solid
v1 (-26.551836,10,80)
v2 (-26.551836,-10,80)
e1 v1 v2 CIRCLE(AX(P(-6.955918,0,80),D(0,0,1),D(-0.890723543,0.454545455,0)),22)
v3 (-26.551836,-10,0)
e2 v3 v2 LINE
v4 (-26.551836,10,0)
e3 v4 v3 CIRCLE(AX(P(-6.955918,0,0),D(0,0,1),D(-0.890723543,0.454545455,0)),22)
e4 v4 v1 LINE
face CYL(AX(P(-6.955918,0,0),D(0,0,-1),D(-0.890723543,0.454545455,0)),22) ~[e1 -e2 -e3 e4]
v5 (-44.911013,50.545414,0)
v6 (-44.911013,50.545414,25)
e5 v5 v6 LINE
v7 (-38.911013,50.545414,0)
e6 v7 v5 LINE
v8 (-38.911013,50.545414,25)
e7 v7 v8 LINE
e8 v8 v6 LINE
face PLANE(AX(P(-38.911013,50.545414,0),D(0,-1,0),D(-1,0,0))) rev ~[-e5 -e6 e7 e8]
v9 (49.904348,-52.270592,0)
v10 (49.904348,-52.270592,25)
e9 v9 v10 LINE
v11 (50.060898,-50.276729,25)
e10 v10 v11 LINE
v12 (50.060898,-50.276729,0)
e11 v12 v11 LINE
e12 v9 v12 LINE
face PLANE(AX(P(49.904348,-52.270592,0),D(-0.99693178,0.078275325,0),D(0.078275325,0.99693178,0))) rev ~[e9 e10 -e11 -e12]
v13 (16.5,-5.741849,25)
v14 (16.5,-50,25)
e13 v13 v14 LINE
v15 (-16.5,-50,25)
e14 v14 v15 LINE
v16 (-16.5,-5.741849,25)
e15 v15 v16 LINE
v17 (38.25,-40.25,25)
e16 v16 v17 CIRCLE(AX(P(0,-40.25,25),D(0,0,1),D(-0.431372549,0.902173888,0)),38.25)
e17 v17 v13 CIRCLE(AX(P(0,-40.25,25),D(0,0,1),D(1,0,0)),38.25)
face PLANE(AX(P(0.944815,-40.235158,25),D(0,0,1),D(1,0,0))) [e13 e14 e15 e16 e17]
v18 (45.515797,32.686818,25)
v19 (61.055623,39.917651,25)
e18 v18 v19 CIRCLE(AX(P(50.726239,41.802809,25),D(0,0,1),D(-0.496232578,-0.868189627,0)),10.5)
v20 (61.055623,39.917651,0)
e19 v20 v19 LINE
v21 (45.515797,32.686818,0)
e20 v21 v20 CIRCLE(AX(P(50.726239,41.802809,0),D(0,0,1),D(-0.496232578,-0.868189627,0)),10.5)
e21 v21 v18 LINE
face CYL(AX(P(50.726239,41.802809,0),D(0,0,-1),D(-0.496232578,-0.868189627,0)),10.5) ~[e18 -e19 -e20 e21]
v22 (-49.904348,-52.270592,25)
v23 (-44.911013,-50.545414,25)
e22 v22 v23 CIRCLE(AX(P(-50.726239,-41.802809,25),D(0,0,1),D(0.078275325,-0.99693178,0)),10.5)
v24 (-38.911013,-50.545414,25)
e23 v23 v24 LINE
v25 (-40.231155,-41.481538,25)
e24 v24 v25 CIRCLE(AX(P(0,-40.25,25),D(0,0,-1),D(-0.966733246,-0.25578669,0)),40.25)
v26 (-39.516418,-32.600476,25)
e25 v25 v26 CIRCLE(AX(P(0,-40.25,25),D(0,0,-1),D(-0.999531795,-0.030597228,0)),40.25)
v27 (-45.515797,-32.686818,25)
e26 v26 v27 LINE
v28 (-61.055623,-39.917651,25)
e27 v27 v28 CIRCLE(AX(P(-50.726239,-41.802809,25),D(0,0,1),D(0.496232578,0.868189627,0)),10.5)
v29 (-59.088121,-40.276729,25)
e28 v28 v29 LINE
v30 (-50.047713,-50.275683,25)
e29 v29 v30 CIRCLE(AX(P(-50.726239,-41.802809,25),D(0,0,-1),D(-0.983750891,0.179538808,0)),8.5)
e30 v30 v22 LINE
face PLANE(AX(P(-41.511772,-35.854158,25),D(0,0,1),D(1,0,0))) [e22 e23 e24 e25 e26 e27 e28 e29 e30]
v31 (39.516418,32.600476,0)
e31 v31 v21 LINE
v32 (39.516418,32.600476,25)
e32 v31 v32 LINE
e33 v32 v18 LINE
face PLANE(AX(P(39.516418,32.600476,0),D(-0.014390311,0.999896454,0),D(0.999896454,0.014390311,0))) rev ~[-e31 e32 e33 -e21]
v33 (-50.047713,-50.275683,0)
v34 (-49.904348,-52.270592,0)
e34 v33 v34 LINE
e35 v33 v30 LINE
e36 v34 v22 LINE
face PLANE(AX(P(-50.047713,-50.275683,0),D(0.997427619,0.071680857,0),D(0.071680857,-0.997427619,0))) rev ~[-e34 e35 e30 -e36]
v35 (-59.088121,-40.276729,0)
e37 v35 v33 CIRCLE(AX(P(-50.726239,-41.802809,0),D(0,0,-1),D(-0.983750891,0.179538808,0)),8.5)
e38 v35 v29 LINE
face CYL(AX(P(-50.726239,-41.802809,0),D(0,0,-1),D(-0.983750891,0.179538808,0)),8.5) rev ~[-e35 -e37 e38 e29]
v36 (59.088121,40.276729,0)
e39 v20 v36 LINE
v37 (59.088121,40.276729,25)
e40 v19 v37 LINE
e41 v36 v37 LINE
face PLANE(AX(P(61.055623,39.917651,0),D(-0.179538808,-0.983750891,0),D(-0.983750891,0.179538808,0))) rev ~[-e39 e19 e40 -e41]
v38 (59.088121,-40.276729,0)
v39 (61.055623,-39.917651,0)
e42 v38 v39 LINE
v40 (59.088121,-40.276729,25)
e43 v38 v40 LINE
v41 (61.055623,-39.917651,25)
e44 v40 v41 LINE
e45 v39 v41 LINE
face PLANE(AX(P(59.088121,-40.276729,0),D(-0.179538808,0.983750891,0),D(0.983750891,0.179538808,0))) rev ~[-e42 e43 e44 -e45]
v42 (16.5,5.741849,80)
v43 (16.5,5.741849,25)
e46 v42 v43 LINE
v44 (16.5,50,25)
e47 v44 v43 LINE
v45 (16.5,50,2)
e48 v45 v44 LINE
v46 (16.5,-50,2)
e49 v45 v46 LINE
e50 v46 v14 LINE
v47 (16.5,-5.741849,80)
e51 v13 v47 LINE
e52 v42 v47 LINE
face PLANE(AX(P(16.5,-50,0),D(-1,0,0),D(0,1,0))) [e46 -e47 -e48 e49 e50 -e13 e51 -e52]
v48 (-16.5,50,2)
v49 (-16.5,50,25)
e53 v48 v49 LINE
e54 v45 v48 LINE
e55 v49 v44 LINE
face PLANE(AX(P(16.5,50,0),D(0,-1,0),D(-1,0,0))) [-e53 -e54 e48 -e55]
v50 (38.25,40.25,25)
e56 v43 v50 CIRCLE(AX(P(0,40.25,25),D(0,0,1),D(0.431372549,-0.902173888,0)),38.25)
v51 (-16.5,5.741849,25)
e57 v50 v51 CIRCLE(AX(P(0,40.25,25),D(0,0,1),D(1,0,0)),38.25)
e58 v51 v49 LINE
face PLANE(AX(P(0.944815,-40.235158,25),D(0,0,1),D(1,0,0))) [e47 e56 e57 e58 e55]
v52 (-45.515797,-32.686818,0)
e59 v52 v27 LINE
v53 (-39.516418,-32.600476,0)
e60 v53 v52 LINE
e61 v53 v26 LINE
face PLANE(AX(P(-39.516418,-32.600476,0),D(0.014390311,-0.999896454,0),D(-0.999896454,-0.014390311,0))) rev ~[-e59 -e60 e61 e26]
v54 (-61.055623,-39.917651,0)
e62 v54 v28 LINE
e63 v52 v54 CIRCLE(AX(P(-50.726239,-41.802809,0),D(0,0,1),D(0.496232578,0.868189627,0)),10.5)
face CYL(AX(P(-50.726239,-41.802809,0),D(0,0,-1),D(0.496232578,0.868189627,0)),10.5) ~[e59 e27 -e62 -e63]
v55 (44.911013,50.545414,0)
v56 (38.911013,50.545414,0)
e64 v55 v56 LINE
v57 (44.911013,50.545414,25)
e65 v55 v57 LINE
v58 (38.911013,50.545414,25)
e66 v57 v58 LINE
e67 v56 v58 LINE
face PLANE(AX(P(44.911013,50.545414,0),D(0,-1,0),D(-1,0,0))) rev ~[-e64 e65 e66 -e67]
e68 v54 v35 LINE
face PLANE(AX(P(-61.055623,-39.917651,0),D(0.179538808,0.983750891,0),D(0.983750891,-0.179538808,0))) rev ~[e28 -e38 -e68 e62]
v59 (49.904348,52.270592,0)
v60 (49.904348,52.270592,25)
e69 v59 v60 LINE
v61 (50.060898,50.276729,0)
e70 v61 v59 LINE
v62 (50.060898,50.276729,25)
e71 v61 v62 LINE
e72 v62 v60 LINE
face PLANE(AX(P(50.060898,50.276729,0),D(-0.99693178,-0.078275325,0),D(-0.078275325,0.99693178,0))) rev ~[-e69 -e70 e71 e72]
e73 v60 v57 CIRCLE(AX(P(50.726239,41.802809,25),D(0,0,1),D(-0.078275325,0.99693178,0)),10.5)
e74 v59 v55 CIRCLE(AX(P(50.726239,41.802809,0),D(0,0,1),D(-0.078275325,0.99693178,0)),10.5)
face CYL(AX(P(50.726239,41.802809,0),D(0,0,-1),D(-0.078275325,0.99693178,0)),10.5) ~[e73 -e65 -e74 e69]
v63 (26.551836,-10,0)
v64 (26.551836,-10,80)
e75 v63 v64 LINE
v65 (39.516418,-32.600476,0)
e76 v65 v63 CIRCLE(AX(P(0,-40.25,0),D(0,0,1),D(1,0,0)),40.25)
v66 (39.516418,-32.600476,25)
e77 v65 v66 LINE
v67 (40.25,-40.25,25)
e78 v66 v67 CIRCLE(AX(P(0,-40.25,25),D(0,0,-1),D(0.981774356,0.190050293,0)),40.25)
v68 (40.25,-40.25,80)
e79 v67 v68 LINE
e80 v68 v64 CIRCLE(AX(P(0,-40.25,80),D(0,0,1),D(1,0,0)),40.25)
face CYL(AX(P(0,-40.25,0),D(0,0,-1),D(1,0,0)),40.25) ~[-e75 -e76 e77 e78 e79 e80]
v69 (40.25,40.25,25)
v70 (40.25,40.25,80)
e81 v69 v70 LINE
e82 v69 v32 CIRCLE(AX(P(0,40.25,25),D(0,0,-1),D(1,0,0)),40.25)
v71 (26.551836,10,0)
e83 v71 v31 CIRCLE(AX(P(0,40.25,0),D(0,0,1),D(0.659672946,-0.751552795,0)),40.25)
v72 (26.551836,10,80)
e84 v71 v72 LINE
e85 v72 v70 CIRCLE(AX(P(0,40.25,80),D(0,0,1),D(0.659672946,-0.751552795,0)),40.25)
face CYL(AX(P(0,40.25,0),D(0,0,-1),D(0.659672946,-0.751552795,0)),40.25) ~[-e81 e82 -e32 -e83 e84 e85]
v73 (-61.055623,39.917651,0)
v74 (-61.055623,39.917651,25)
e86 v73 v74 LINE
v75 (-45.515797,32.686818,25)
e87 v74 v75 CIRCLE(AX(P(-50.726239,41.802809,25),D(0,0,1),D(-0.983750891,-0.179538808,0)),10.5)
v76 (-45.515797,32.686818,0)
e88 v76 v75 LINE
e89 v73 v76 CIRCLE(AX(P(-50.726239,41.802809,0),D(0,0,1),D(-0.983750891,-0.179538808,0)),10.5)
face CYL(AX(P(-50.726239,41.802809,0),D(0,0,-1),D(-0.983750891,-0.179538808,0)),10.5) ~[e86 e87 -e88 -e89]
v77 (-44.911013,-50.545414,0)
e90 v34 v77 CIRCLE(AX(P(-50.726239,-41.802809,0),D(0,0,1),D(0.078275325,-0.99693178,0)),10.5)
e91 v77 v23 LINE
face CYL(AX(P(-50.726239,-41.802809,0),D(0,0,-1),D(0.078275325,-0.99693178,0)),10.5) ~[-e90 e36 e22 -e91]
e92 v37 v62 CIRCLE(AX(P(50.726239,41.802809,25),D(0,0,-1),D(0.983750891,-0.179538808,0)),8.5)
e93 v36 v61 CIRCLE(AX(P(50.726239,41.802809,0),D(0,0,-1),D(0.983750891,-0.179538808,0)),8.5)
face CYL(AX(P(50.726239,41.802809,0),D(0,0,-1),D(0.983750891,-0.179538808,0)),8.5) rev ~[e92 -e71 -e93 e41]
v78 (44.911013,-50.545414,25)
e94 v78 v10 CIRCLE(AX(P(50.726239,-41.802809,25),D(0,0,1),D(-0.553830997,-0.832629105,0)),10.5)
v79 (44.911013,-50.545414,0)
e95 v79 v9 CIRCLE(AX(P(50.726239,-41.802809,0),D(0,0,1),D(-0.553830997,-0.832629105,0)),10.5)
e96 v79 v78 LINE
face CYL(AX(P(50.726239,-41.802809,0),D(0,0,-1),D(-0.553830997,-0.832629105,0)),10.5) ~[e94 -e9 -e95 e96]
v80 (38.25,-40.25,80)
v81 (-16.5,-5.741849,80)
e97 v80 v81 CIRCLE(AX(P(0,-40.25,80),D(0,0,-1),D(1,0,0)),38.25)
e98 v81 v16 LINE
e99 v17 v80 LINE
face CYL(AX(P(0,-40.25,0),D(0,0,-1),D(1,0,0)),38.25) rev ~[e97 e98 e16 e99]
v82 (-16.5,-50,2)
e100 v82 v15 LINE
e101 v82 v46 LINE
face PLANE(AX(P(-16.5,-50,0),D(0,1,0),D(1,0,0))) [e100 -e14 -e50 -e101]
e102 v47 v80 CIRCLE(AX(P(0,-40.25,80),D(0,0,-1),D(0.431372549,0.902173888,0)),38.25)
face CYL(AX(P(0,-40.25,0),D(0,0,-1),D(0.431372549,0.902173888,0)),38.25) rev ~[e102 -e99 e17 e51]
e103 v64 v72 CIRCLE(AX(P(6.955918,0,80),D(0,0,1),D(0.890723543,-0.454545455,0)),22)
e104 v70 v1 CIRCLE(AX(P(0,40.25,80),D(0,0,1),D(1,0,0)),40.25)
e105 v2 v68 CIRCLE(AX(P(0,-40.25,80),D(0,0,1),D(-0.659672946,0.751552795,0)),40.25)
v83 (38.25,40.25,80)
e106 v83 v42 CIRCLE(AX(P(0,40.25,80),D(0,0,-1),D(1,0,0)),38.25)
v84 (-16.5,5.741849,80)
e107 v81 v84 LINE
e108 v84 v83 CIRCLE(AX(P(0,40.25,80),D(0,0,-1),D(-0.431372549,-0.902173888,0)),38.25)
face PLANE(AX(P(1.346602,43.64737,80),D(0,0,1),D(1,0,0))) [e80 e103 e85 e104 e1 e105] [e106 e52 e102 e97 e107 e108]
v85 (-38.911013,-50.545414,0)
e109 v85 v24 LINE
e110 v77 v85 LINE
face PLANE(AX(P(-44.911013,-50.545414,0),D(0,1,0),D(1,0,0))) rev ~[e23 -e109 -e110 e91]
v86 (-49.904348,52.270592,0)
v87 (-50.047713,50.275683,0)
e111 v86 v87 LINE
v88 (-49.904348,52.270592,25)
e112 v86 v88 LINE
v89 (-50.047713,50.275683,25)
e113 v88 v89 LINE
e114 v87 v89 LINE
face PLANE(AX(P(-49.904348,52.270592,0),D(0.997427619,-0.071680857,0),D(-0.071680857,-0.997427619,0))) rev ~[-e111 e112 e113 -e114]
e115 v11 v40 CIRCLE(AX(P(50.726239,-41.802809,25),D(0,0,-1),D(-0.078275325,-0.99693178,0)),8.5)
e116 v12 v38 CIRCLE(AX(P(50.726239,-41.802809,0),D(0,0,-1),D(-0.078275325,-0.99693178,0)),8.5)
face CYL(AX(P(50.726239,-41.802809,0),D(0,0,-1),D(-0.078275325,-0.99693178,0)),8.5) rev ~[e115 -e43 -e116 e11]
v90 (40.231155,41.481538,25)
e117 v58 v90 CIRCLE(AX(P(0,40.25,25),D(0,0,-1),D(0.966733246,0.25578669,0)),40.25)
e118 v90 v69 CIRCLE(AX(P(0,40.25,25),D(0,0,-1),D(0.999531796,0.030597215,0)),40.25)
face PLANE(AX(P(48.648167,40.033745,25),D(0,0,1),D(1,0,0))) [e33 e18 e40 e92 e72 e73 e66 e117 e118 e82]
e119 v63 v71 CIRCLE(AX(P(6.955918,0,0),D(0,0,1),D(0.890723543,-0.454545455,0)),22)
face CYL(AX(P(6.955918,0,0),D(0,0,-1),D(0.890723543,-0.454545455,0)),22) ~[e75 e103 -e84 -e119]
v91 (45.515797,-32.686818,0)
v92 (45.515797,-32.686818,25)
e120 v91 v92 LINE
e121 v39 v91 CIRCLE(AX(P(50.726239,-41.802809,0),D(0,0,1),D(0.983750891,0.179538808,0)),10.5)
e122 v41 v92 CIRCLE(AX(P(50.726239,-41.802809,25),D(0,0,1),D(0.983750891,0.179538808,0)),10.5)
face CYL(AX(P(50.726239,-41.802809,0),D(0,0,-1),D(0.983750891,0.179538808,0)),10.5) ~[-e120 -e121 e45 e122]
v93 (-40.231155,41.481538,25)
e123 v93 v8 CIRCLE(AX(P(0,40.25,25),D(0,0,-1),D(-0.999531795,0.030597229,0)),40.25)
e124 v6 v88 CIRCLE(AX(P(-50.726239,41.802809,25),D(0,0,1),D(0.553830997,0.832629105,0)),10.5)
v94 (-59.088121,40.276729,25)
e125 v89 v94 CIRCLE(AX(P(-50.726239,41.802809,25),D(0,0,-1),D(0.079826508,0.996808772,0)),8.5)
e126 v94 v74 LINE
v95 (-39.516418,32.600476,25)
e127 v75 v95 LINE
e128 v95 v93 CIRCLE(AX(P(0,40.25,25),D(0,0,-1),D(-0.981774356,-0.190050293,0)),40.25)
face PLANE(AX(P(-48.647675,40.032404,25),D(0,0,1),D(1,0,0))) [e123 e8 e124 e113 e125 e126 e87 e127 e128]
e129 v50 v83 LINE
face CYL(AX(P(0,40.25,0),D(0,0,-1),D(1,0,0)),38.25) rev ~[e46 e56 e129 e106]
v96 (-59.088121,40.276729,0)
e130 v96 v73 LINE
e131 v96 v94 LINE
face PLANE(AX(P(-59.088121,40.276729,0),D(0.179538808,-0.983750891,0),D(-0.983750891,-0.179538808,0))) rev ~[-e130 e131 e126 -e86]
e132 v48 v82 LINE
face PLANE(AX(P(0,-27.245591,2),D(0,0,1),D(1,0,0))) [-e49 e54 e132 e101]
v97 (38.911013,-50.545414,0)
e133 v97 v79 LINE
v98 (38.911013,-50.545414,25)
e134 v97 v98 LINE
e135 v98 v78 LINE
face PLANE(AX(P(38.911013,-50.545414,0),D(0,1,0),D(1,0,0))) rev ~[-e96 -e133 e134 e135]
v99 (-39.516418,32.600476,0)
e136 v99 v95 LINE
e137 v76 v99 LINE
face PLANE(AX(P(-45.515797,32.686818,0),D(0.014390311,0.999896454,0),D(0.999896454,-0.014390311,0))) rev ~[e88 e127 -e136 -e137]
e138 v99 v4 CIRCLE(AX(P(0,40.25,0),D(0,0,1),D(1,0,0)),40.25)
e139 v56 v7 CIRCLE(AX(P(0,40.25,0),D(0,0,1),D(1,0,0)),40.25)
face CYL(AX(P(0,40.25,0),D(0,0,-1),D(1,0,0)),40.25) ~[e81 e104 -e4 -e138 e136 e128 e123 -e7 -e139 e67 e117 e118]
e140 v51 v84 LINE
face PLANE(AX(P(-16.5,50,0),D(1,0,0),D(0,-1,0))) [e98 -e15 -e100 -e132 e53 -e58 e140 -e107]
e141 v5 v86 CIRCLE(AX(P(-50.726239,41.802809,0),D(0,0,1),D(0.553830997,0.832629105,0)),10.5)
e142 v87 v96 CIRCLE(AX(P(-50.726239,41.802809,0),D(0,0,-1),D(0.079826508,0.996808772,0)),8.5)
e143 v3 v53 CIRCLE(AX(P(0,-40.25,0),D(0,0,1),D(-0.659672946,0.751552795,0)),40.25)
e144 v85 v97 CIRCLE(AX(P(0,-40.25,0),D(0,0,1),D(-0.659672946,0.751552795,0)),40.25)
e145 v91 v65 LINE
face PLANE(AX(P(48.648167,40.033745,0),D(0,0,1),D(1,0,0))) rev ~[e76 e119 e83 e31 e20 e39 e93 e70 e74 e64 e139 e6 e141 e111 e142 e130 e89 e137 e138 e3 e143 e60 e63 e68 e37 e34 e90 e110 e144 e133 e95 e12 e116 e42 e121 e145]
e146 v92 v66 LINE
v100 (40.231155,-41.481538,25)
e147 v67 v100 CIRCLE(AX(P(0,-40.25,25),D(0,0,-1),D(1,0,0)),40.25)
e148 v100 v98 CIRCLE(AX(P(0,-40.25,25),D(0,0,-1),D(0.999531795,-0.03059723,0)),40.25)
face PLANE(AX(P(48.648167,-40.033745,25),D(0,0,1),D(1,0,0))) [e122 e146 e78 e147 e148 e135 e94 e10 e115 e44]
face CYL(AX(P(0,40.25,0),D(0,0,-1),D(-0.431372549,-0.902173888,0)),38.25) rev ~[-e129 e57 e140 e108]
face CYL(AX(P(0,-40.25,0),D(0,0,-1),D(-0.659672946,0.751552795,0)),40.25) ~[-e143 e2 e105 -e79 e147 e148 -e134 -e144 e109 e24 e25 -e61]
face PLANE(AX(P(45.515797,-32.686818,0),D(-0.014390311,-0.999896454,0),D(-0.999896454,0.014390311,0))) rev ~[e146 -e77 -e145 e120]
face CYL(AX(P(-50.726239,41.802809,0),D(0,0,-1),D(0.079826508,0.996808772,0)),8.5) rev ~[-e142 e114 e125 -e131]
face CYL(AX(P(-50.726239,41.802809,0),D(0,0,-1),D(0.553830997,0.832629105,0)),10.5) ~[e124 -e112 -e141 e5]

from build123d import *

# Parameters (mm, degrees)
F1_DEPTH = 80
F2_DEPTH = 25
F3_DEPTH = 27
F4_DEPTH = 2
F6_DEPTH = 25


# Not quite as in the source:
# - a feature names something its author has since deleted; it is built from what else it names


with BuildPart() as f1:
    # F0 (on Top) → F1 (new body)
    with BuildSketch(Plane.XY):
        with BuildLine():
            ThreePointArc((-16.5, 5.741848789), (-20.3953119613, 72.6088280072), (38.25, 40.25))
            ThreePointArc((38.25, 40.25), (32.3588280072, 19.8546880387), (16.5, 5.741848789))
            Line((16.5, 5.741848789), (16.5, 3.5374340314))
            ThreePointArc((16.5, 3.5374340314), (17.9795575149, 4.2389182116), (19.4293592277, 5))
            ThreePointArc((19.4293592277, 5), (23.1261233418, 7.306944295), (26.5518360947, 10))
            ThreePointArc((26.5518360947, 10), (36.6658826623, 23.6465199854), (40.25, 40.25))
            ThreePointArc((40.25, 40.25), (-16.6034800146, 76.9158826623), (-26.5518360947, 10))
            ThreePointArc((-26.5518360947, 10), (-23.1261233418, 7.306944295), (-19.4293592277, 5))
            ThreePointArc((-19.4293592277, 5), (-17.9795575149, 4.2389182116), (-16.5, 3.5374340314))
            Line((-16.5, 3.5374340314), (-16.5, 5.741848789))
        make_face()
        with BuildLine():
            Line((-19.4293592277, -5), (-19.4293592277, 5))
            ThreePointArc((-19.4293592277, 5), (-23.1261233418, 7.306944295), (-26.5518360947, 10))
            ThreePointArc((-26.5518360947, 10), (-28.9559181524, 0), (-26.5518360947, -10))
            ThreePointArc((-26.5518360947, -10), (-23.1261233418, -7.306944295), (-19.4293592277, -5))
        make_face()
        with BuildLine():
            Line((-16.5, -5.741848789), (-16.5, -3.5374340314))
            ThreePointArc((-16.5, -3.5374340314), (-17.9795575149, -4.2389182116), (-19.4293592277, -5))
            ThreePointArc((-19.4293592277, -5), (-23.1261233418, -7.306944295), (-26.5518360947, -10))
            ThreePointArc((-26.5518360947, -10), (-16.6034800146, -76.9158826623), (40.25, -40.25))
            ThreePointArc((40.25, -40.25), (36.6658826623, -23.6465199854), (26.5518360947, -10))
            ThreePointArc((26.5518360947, -10), (23.1261233418, -7.306944295), (19.4293592277, -5))
            ThreePointArc((19.4293592277, -5), (17.9795575149, -4.2389182116), (16.5, -3.5374340314))
            Line((16.5, -3.5374340314), (16.5, -5.741848789))
            ThreePointArc((16.5, -5.741848789), (32.3588280072, -19.8546880387), (38.25, -40.25))
            ThreePointArc((38.25, -40.25), (-20.3953119613, -72.6088280072), (-16.5, -5.741848789))
        make_face()
        with BuildLine():
            ThreePointArc((26.5518360947, 10), (23.1261233418, 7.306944295), (19.4293592277, 5))
            Line((19.4293592277, 5), (19.4293592277, -5))
            ThreePointArc((19.4293592277, -5), (23.1261233418, -7.306944295), (26.5518360947, -10))
            ThreePointArc((26.5518360947, -10), (28.9559181524, 0), (26.5518360947, 10))
        make_face()
        with BuildLine():
            ThreePointArc((19.4293592277, 5), (17.9795575149, 4.2389182116), (16.5, 3.5374340314))
            Line((16.5, 3.5374340314), (16.5, -3.5374340314))
            ThreePointArc((16.5, -3.5374340314), (17.9795575149, -4.2389182116), (19.4293592277, -5))
            Line((19.4293592277, -5), (19.4293592277, 5))
        make_face()
        with BuildLine():
            Line((-16.5, -3.5374340314), (-16.5, 3.5374340314))
            ThreePointArc((-16.5, 3.5374340314), (-17.9795575149, 4.2389182116), (-19.4293592277, 5))
            Line((-19.4293592277, 5), (-19.4293592277, -5))
            ThreePointArc((-19.4293592277, -5), (-17.9795575149, -4.2389182116), (-16.5, -3.5374340314))
        make_face()
    extrude(amount=F1_DEPTH)

    # F0 (on Top) → F2 (join)
    with BuildSketch(Plane.XY):
        with BuildLine():
            Line((-16.5, -50), (-16.5, -5.741848789))
            ThreePointArc((-16.5, -5.741848789), (-20.3953119613, -72.6088280072), (38.25, -40.25))
            ThreePointArc((38.25, -40.25), (32.3588280072, -19.8546880387), (16.5, -5.741848789))
            Line((16.5, -5.741848789), (16.5, -50))
            Line((16.5, -50), (-16.5, -50))
        make_face()
        with BuildLine():
            ThreePointArc((16.5, 5.741848789), (32.3588280072, 19.8546880387), (38.25, 40.25))
            ThreePointArc((38.25, 40.25), (-20.3953119613, 72.6088280072), (-16.5, 5.741848789))
            Line((-16.5, 5.741848789), (-16.5, 50))
            Line((-16.5, 50), (16.5, 50))
            Line((16.5, 50), (16.5, 5.741848789))
        make_face()
        with BuildLine():
            ThreePointArc((16.5, -5.741848789), (0, -2), (-16.5, -5.741848789))
            Line((-16.5, -5.741848789), (-16.5, -50))
            Line((-16.5, -50), (16.5, -50))
            Line((16.5, -50), (16.5, -5.741848789))
        make_face()
        with BuildLine():
            Line((-16.5, 50), (-16.5, 5.741848789))
            ThreePointArc((-16.5, 5.741848789), (0, 2), (16.5, 5.741848789))
            Line((16.5, 5.741848789), (16.5, 50))
            Line((16.5, 50), (-16.5, 50))
        make_face()
        with BuildLine():
            ThreePointArc((19.4293592277, 5), (17.9795575149, 4.2389182116), (16.5, 3.5374340314))
            Line((16.5, 3.5374340314), (16.5, -3.5374340314))
            ThreePointArc((16.5, -3.5374340314), (17.9795575149, -4.2389182116), (19.4293592277, -5))
            Line((19.4293592277, -5), (19.4293592277, 5))
        make_face()
        with BuildLine():
            Line((-16.5, -3.5374340314), (-16.5, 3.5374340314))
            ThreePointArc((-16.5, 3.5374340314), (-17.9795575149, 4.2389182116), (-19.4293592277, 5))
            Line((-19.4293592277, 5), (-19.4293592277, -5))
            ThreePointArc((-19.4293592277, -5), (-17.9795575149, -4.2389182116), (-16.5, -3.5374340314))
        make_face()
        with BuildLine():
            ThreePointArc((1.604e-07, 0), (-8.4374675441, 0.8942934069), (-16.5, 3.5374340314))
            Line((-16.5, 3.5374340314), (-16.5, -3.5374340314))
            ThreePointArc((-16.5, -3.5374340314), (-8.4374675441, -0.8942934069), (1.604e-07, 0))
        make_face()
        with BuildLine():
            ThreePointArc((16.5, 5.741848789), (0, 2), (-16.5, 5.741848789))
            Line((-16.5, 5.741848789), (-16.5, 3.5374340314))
            ThreePointArc((-16.5, 3.5374340314), (-8.4374675441, 0.8942934069), (1.604e-07, 0))
            ThreePointArc((1.604e-07, 0), (8.437467701, 0.8942934405), (16.5, 3.5374340314))
            Line((16.5, 3.5374340314), (16.5, 5.741848789))
        make_face()
        with BuildLine():
            ThreePointArc((16.5, -3.5374340314), (8.437467701, -0.8942934405), (1.604e-07, 0))
            ThreePointArc((1.604e-07, 0), (-8.4374675441, -0.8942934069), (-16.5, -3.5374340314))
            Line((-16.5, -3.5374340314), (-16.5, -5.741848789))
            ThreePointArc((-16.5, -5.741848789), (0, -2), (16.5, -5.741848789))
            Line((16.5, -5.741848789), (16.5, -3.5374340314))
        make_face()
        with BuildLine():
            Line((16.5, -3.5374340314), (16.5, 3.5374340314))
            ThreePointArc((16.5, 3.5374340314), (8.437467701, 0.8942934405), (1.604e-07, 0))
            ThreePointArc((1.604e-07, 0), (8.437467701, -0.8942934405), (16.5, -3.5374340314))
        make_face()
    extrude(amount=F2_DEPTH)

    # F0 (on Top) → F3 (cut)
    with BuildSketch(Plane.XY):
        with BuildLine():
            Line((-16.5, 50), (-16.5, 5.741848789))
            ThreePointArc((-16.5, 5.741848789), (0, 2), (16.5, 5.741848789))
            Line((16.5, 5.741848789), (16.5, 50))
            Line((16.5, 50), (-16.5, 50))
        make_face()
        with BuildLine():
            ThreePointArc((16.5, -5.741848789), (0, -2), (-16.5, -5.741848789))
            Line((-16.5, -5.741848789), (-16.5, -50))
            Line((-16.5, -50), (16.5, -50))
            Line((16.5, -50), (16.5, -5.741848789))
        make_face()
        with BuildLine():
            ThreePointArc((16.5, 5.741848789), (0, 2), (-16.5, 5.741848789))
            Line((-16.5, 5.741848789), (-16.5, 3.5374340314))
            ThreePointArc((-16.5, 3.5374340314), (-8.4374675441, 0.8942934069), (1.604e-07, 0))
            ThreePointArc((1.604e-07, 0), (8.437467701, 0.8942934405), (16.5, 3.5374340314))
            Line((16.5, 3.5374340314), (16.5, 5.741848789))
        make_face()
        with BuildLine():
            ThreePointArc((16.5, -3.5374340314), (8.437467701, -0.8942934405), (1.604e-07, 0))
            ThreePointArc((1.604e-07, 0), (-8.4374675441, -0.8942934069), (-16.5, -3.5374340314))
            Line((-16.5, -3.5374340314), (-16.5, -5.741848789))
            ThreePointArc((-16.5, -5.741848789), (0, -2), (16.5, -5.741848789))
            Line((16.5, -5.741848789), (16.5, -3.5374340314))
        make_face()
        with BuildLine():
            Line((16.5, -3.5374340314), (16.5, 3.5374340314))
            ThreePointArc((16.5, 3.5374340314), (8.437467701, 0.8942934405), (1.604e-07, 0))
            ThreePointArc((1.604e-07, 0), (8.437467701, -0.8942934405), (16.5, -3.5374340314))
        make_face()
        with BuildLine():
            ThreePointArc((1.604e-07, 0), (-8.4374675441, 0.8942934069), (-16.5, 3.5374340314))
            Line((-16.5, 3.5374340314), (-16.5, -3.5374340314))
            ThreePointArc((-16.5, -3.5374340314), (-8.4374675441, -0.8942934069), (1.604e-07, 0))
        make_face()
    extrude(amount=F3_DEPTH, mode=Mode.SUBTRACT)

    # F0 (on Top) → F4 (join)
    with BuildSketch(Plane.XY):
        with BuildLine():
            ThreePointArc((16.5, -5.741848789), (0, -2), (-16.5, -5.741848789))
            Line((-16.5, -5.741848789), (-16.5, -50))
            Line((-16.5, -50), (16.5, -50))
            Line((16.5, -50), (16.5, -5.741848789))
        make_face()
        with BuildLine():
            Line((16.5, -3.5374340314), (16.5, 3.5374340314))
            ThreePointArc((16.5, 3.5374340314), (8.437467701, 0.8942934405), (1.604e-07, 0))
            ThreePointArc((1.604e-07, 0), (8.437467701, -0.8942934405), (16.5, -3.5374340314))
        make_face()
        with BuildLine():
            ThreePointArc((16.5, -3.5374340314), (8.437467701, -0.8942934405), (1.604e-07, 0))
            ThreePointArc((1.604e-07, 0), (-8.4374675441, -0.8942934069), (-16.5, -3.5374340314))
            Line((-16.5, -3.5374340314), (-16.5, -5.741848789))
            ThreePointArc((-16.5, -5.741848789), (0, -2), (16.5, -5.741848789))
            Line((16.5, -5.741848789), (16.5, -3.5374340314))
        make_face()
        with BuildLine():
            Line((-16.5, 50), (-16.5, 5.741848789))
            ThreePointArc((-16.5, 5.741848789), (0, 2), (16.5, 5.741848789))
            Line((16.5, 5.741848789), (16.5, 50))
            Line((16.5, 50), (-16.5, 50))
        make_face()
        with BuildLine():
            ThreePointArc((1.604e-07, 0), (-8.4374675441, 0.8942934069), (-16.5, 3.5374340314))
            Line((-16.5, 3.5374340314), (-16.5, -3.5374340314))
            ThreePointArc((-16.5, -3.5374340314), (-8.4374675441, -0.8942934069), (1.604e-07, 0))
        make_face()
        with BuildLine():
            ThreePointArc((16.5, 5.741848789), (0, 2), (-16.5, 5.741848789))
            Line((-16.5, 5.741848789), (-16.5, 3.5374340314))
            ThreePointArc((-16.5, 3.5374340314), (-8.4374675441, 0.8942934069), (1.604e-07, 0))
            ThreePointArc((1.604e-07, 0), (8.437467701, 0.8942934405), (16.5, 3.5374340314))
            Line((16.5, 3.5374340314), (16.5, 5.741848789))
        make_face()
        with BuildLine():
            ThreePointArc((19.4293592277, 5), (17.9795575149, 4.2389182116), (16.5, 3.5374340314))
            Line((16.5, 3.5374340314), (16.5, -3.5374340314))
            ThreePointArc((16.5, -3.5374340314), (17.9795575149, -4.2389182116), (19.4293592277, -5))
            Line((19.4293592277, -5), (19.4293592277, 5))
        make_face()
    extrude(amount=F4_DEPTH)

    # F5 (on Top) → F6 (join)
    with BuildSketch(Plane.XY):
        with BuildLine():
            Line((50.0608983682, 50.276728797), (49.9043477191, 52.2705923566))
            ThreePointArc((49.9043477191, 52.2705923566), (47.2974067112, 51.7271782555), (44.9110131577, 50.5454142725))
            ThreePointArc((44.9110131577, 50.5454142725), (41.3964470277, 46.6199643352), (40.2311547735, 41.4815378976))
            ThreePointArc((40.2311547735, 41.4815378976), (41.7260907127, 36.3947279075), (45.5157965565, 32.6868175855))
            ThreePointArc((45.5157965565, 32.6868175855), (55.1559261055, 32.2829416087), (61.0556229863, 39.9176511802))
            Line((61.0556229863, 39.9176511802), (59.0881212036, 40.276728797))
            ThreePointArc((59.0881212036, 40.276728797), (44.416786122, 36.1071252956), (50.0608983682, 50.276728797))
        make_face()
        with BuildLine():
            ThreePointArc((45.5157965565, 32.6868175855), (41.7260907127, 36.3947279075), (40.2311547735, 41.4815378976))
            ThreePointArc((40.2311547735, 41.4815378976), (40.2452884176, 40.8658410379), (40.25, 40.25))
            ThreePointArc((40.25, 40.25), (40.0661847306, 36.4076906509), (39.5164178318, 32.6004757181))
            Line((39.5164178318, 32.6004757181), (45.5157965565, 32.6868175855))
        make_face()
        with BuildLine():
            ThreePointArc((40.2311547735, 41.4815378976), (41.3964470277, 46.6199643352), (44.9110131577, 50.5454142725))
            Line((44.9110131577, 50.5454142725), (38.9110131577, 50.5454142725))
            ThreePointArc((38.9110131577, 50.5454142725), (39.8297520698, 46.0511507526), (40.2311547735, 41.4815378976))
        make_face()
        with BuildLine():
            ThreePointArc((-40.2311547563, 41.4815384597), (-41.3964471567, 46.619964585), (-44.9110131577, 50.5454142725))
            ThreePointArc((-44.9110131577, 50.5454142725), (-47.2974067112, 51.7271782555), (-49.9043477191, 52.2705923566))
            Line((-49.9043477191, 52.2705923566), (-50.0477133056, 50.2756832334))
            ThreePointArc((-50.0477133056, 50.2756832334), (-44.4212194253, 36.102218097), (-59.0881212036, 40.276728797))
            Line((-59.0881212036, 40.276728797), (-61.0556229863, 39.9176511802))
            ThreePointArc((-61.0556229863, 39.9176511802), (-55.1559261055, 32.2829416087), (-45.5157965565, 32.6868175855))
            ThreePointArc((-45.5157965565, 32.6868175855), (-41.7260905679, 36.3947281485), (-40.2311547563, 41.4815384597))
        make_face()
        with BuildLine():
            ThreePointArc((-39.5164178318, 32.6004757181), (-40.1202835518, 37.021169295), (-40.2311547563, 41.4815384597))
            ThreePointArc((-40.2311547563, 41.4815384597), (-41.7260905679, 36.3947281485), (-45.5157965565, 32.6868175855))
            Line((-45.5157965565, 32.6868175855), (-39.5164178318, 32.6004757181))
        make_face()
        with BuildLine():
            ThreePointArc((-40.2311547563, 41.4815384597), (-39.8297520293, 46.0511510308), (-38.9110131577, 50.5454142725))
            Line((-38.9110131577, 50.5454142725), (-44.9110131577, 50.5454142725))
            ThreePointArc((-44.9110131577, 50.5454142725), (-41.3964471567, 46.619964585), (-40.2311547563, 41.4815384597))
        make_face()
        with BuildLine():
            ThreePointArc((61.0556229863, -39.9176511802), (55.1559261055, -32.2829416087), (45.5157965565, -32.6868175855))
            ThreePointArc((45.5157965565, -32.6868175855), (41.7260905575, -36.3947281657), (40.231154755, -41.4815384999))
            ThreePointArc((40.231154755, -41.4815384999), (41.3964471659, -46.6199646029), (44.9110131577, -50.5454142725))
            ThreePointArc((44.9110131577, -50.5454142725), (47.2974067112, -51.7271782555), (49.9043477191, -52.2705923566))
            Line((49.9043477191, -52.2705923566), (50.0608983682, -50.276728797))
            ThreePointArc((50.0608983682, -50.276728797), (44.416786122, -36.1071252956), (59.0881212036, -40.276728797))
            Line((59.0881212036, -40.276728797), (61.0556229863, -39.9176511802))
        make_face()
        with BuildLine():
            Line((45.5157965565, -32.6868175855), (39.5164178318, -32.6004757181))
            ThreePointArc((39.5164178318, -32.6004757181), (40.0661847306, -36.4076906509), (40.25, -40.25))
            ThreePointArc((40.25, -40.25), (40.245288413, -40.8658413392), (40.231154755, -41.4815384999))
            ThreePointArc((40.231154755, -41.4815384999), (41.7260905575, -36.3947281657), (45.5157965565, -32.6868175855))
        make_face()
        with BuildLine():
            ThreePointArc((44.9110131577, -50.5454142725), (41.3964471659, -46.6199646029), (40.231154755, -41.4815384999))
            ThreePointArc((40.231154755, -41.4815384999), (39.8297520264, -46.0511510507), (38.9110131577, -50.5454142725))
            Line((38.9110131577, -50.5454142725), (44.9110131577, -50.5454142725))
        make_face()
        with BuildLine():
            ThreePointArc((-40.2311547578, -41.481538411), (-40.1202835499, -37.0211692707), (-39.5164178318, -32.6004757181))
            Line((-39.5164178318, -32.6004757181), (-45.5157965565, -32.6868175855))
            ThreePointArc((-45.5157965565, -32.6868175855), (-41.7260905804, -36.3947281276), (-40.2311547578, -41.481538411))
        make_face()
        with BuildLine():
            ThreePointArc((-38.9110131577, -50.5454142725), (-39.8297520328, -46.0511510067), (-40.2311547578, -41.481538411))
            ThreePointArc((-40.2311547578, -41.481538411), (-41.3964471455, -46.6199645634), (-44.9110131577, -50.5454142725))
            Line((-44.9110131577, -50.5454142725), (-38.9110131577, -50.5454142725))
        make_face()
        with BuildLine():
            ThreePointArc((-40.2311547578, -41.481538411), (-41.7260905804, -36.3947281276), (-45.5157965565, -32.6868175855))
            ThreePointArc((-45.5157965565, -32.6868175855), (-55.1559261055, -32.2829416087), (-61.0556229863, -39.9176511802))
            Line((-61.0556229863, -39.9176511802), (-59.0881212036, -40.276728797))
            ThreePointArc((-59.0881212036, -40.276728797), (-44.4212194253, -36.102218097), (-50.0477133056, -50.2756832334))
            Line((-50.0477133056, -50.2756832334), (-49.9043477191, -52.2705923566))
            ThreePointArc((-49.9043477191, -52.2705923566), (-47.2974067112, -51.7271782555), (-44.9110131577, -50.5454142725))
            ThreePointArc((-44.9110131577, -50.5454142725), (-41.3964471455, -46.6199645634), (-40.2311547578, -41.481538411))
        make_face()
    extrude(amount=F6_DEPTH)


solid = f1.part
